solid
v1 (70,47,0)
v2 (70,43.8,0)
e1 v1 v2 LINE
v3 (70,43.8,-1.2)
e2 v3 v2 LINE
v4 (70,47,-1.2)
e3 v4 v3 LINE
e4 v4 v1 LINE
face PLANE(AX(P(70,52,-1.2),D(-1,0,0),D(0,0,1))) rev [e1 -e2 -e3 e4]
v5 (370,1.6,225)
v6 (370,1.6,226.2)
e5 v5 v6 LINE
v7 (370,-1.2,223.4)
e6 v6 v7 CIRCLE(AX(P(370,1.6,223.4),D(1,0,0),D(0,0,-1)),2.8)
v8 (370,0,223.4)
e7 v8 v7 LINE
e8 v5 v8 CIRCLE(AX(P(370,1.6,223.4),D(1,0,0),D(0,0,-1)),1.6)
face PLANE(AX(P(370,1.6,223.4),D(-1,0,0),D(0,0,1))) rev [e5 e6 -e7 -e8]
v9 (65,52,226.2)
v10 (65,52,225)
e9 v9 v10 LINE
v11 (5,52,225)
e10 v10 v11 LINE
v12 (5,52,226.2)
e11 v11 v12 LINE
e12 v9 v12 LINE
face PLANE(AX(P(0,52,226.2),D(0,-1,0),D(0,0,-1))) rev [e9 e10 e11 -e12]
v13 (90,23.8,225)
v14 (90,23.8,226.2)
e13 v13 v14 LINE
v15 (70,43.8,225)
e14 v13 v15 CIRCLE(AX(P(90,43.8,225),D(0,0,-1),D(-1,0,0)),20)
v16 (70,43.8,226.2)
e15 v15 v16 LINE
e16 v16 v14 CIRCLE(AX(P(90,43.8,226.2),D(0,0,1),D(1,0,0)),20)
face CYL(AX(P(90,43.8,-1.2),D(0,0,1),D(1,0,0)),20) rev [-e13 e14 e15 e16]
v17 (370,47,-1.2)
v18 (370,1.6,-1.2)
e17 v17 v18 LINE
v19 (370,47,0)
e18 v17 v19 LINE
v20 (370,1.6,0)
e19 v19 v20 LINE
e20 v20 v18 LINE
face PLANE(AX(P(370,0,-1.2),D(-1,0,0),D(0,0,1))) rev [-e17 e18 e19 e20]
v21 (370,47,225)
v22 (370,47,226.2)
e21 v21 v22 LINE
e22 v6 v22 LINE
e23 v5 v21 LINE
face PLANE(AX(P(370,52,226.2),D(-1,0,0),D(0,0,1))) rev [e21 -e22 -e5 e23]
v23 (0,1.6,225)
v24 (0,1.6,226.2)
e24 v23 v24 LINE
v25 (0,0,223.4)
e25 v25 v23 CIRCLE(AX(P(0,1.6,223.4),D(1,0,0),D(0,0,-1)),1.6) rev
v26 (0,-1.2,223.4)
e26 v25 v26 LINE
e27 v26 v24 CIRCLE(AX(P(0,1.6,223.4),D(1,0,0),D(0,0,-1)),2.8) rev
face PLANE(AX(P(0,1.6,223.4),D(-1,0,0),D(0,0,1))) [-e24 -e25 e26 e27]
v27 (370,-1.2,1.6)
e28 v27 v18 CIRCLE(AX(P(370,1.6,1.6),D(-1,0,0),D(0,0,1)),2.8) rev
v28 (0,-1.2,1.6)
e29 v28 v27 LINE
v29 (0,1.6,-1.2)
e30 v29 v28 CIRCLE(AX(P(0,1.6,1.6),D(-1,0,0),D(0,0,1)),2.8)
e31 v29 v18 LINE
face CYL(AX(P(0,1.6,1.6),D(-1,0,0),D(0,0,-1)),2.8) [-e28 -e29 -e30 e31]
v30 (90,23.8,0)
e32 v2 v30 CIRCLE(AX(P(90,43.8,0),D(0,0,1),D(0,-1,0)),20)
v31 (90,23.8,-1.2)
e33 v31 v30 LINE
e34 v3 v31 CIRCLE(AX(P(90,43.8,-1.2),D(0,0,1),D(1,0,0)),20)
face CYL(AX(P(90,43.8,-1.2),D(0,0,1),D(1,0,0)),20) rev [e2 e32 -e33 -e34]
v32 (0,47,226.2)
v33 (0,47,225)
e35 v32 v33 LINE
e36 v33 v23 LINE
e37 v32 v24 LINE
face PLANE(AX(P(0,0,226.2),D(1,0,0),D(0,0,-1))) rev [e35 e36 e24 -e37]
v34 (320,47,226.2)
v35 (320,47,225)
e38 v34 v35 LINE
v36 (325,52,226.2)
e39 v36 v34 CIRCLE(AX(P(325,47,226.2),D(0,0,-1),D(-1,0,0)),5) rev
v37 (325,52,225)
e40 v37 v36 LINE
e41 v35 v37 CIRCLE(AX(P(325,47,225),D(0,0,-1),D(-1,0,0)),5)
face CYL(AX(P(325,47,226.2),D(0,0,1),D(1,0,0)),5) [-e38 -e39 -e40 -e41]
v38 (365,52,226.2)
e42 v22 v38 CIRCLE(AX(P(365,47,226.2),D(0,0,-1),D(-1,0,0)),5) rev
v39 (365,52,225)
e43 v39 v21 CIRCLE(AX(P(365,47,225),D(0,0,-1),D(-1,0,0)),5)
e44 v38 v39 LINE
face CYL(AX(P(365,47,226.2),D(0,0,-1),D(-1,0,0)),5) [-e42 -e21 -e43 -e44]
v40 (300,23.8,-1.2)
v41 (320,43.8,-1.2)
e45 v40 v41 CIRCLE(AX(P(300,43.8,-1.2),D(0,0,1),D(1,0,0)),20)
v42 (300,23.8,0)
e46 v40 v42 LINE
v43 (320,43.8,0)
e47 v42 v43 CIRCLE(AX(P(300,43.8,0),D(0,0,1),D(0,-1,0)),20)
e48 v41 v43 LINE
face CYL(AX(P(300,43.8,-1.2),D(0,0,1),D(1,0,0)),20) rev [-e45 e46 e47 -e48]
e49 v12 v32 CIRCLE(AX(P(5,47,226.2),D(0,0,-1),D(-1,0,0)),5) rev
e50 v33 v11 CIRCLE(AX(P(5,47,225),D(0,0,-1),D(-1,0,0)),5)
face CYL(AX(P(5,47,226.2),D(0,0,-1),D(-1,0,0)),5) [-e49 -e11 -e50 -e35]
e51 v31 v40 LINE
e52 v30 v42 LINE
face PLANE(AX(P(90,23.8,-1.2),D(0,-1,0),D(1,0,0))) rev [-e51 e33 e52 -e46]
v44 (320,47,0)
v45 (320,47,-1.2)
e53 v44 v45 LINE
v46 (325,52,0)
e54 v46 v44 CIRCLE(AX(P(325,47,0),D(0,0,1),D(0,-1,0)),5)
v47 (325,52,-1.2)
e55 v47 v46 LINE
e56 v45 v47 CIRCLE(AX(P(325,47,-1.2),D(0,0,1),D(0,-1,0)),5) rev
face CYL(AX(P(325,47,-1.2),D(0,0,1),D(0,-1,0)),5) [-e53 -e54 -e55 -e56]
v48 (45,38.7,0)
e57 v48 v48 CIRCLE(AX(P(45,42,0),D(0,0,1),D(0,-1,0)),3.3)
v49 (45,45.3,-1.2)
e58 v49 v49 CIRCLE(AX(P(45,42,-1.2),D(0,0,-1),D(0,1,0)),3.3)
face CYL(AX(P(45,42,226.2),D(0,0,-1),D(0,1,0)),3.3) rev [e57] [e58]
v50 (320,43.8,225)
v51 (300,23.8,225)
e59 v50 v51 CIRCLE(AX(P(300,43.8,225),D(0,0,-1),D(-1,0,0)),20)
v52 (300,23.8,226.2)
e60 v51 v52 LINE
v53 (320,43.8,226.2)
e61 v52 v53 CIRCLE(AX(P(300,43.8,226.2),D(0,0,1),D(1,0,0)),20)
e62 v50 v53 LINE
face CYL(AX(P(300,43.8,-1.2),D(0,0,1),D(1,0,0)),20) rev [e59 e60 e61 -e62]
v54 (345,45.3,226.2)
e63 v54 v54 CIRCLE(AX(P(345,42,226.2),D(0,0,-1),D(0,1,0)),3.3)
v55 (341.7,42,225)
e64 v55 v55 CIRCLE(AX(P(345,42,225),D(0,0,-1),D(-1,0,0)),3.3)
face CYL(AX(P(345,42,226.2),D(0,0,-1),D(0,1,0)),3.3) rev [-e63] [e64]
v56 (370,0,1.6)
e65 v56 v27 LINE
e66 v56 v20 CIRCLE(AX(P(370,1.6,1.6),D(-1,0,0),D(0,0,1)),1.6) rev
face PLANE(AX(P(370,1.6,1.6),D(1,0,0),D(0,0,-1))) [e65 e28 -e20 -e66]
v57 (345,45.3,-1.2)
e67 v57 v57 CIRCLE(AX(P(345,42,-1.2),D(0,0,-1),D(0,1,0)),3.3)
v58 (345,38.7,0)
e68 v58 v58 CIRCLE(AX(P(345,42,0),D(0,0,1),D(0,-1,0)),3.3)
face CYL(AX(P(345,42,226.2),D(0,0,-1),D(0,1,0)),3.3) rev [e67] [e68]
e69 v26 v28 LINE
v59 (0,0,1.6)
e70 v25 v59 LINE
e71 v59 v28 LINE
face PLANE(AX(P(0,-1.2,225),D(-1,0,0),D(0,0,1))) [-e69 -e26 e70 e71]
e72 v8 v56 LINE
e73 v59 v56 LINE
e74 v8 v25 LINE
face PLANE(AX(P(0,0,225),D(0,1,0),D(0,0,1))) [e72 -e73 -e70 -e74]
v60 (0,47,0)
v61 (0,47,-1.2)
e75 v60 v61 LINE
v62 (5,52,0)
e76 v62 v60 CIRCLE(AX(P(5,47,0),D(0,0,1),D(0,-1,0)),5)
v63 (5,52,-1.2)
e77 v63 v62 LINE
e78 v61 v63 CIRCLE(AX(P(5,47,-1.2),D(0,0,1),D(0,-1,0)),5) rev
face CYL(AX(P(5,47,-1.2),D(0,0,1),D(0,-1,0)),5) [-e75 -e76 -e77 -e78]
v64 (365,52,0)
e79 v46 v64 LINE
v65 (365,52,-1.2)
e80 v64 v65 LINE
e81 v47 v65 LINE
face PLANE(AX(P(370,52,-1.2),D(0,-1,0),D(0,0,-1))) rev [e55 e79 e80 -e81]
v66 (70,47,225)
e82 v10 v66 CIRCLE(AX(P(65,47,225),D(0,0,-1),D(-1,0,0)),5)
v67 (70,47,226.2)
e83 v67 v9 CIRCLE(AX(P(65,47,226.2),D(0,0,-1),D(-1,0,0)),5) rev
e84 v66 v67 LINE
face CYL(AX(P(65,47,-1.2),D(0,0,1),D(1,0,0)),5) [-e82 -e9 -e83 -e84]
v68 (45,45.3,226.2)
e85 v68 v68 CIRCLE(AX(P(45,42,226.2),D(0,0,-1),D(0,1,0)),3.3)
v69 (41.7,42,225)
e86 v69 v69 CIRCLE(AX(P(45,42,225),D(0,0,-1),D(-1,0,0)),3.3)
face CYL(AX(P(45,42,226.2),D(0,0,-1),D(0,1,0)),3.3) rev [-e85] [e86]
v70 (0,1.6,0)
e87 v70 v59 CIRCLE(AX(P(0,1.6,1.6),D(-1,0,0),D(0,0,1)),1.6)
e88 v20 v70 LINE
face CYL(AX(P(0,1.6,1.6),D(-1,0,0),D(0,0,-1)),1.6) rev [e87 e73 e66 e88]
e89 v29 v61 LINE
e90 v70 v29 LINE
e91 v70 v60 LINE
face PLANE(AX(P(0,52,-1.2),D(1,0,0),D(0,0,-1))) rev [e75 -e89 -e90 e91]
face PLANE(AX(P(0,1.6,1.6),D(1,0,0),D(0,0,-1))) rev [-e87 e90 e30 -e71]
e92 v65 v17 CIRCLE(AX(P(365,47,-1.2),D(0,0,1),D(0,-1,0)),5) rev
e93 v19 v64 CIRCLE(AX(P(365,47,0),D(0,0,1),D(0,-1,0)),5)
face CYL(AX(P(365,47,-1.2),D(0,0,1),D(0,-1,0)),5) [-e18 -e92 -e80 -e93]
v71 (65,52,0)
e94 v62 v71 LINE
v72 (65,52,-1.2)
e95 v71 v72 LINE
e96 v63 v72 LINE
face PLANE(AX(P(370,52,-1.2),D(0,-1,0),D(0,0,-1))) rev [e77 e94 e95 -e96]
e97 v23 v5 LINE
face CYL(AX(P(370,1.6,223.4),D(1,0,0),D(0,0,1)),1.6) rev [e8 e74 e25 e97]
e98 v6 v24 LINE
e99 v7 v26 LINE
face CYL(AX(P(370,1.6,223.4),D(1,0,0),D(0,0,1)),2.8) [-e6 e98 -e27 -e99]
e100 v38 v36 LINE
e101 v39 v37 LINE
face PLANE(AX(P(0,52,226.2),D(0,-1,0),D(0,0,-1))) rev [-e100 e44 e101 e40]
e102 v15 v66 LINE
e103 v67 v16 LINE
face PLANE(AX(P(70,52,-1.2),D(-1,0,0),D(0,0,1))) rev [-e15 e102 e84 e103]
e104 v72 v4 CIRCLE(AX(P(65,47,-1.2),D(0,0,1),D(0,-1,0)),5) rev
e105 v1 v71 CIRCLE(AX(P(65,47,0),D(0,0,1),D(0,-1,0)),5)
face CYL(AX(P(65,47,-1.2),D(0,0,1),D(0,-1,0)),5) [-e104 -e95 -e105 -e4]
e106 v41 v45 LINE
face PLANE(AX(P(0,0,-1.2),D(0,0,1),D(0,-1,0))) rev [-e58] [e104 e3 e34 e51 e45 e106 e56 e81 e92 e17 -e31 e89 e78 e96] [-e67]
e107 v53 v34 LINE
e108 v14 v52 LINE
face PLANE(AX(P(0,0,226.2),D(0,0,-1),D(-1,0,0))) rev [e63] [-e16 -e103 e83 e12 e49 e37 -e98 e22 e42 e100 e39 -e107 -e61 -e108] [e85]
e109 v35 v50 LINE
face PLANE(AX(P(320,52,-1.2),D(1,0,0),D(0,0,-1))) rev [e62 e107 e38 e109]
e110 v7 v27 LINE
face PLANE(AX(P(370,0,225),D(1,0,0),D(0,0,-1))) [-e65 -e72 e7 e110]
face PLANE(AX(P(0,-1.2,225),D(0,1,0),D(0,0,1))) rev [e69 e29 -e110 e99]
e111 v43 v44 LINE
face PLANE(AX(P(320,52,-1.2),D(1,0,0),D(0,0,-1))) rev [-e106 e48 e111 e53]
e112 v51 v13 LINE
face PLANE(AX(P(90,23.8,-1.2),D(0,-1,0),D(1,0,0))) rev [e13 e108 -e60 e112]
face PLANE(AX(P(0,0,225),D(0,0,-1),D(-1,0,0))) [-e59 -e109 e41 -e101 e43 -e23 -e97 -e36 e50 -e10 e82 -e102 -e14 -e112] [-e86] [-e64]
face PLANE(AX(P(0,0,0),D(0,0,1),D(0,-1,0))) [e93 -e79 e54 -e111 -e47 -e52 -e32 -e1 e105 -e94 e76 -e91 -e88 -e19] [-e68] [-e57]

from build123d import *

# Parameters (mm, degrees)
SKETCH_1_W                         = 370
SKETCH_1_H                         = 1.2
SM_BASE_FLANGE_1_DEPTH             = 225
SM_EDGE_FLANGE_1_STRIP_W           = 8
SM_EDGE_FLANGE_1_STRIP_H           = 1.2
SM_EDGE_FLANGE_1_STRIP_CUT_DEPTH   = 370
SM_EDGE_FLANGE_1_STRIP_2_W         = 8
SM_EDGE_FLANGE_1_STRIP_2_H         = 1.2
SM_EDGE_FLANGE_1_STRIP_CUT_2_DEPTH = 370
SM_EDGE_FLANGE_1_DEPTH             = 370
SM_EDGE_FLANGE_1_BEND_DEPTH        = 370
CUT_EXTRUDE_1_DEPTH                = 438.395427502
FILLET_1_R                         = 5
SKETCH_17_R                        = 3.3
CUT_EXTRUDE_2_DEPTH                = 438.395427502


# Sheet-metal steps are written as plain solids
with BuildPart() as part:
    # Sketch 1 → Базовая кромка1 (new body)
    with BuildSketch(Plane.XY):
        with Locations((185, -0.6)):
            Rectangle(SKETCH_1_W, SKETCH_1_H)
    extrude(amount=SM_BASE_FLANGE_1_DEPTH)

    # Ребро-кромка1 strip (across the edge) → Ребро-кромка1 strip cut (cut)
    with BuildSketch(Plane(origin=(0, 0, 225), x_dir=(0, 0, -1), z_dir=(1, 0, 0))):
        with Locations((-2.4, -0.6)):
            Rectangle(SM_EDGE_FLANGE_1_STRIP_W, SM_EDGE_FLANGE_1_STRIP_H)
    extrude(amount=SM_EDGE_FLANGE_1_STRIP_CUT_DEPTH, mode=Mode.SUBTRACT)

    # Ребро-кромка1 strip 2 (across the edge) → Ребро-кромка1 strip cut 2 (cut)
    with BuildSketch(Plane.ZY.offset(-370)):
        with Locations((-2.4, -0.6)):
            Rectangle(SM_EDGE_FLANGE_1_STRIP_2_W, SM_EDGE_FLANGE_1_STRIP_2_H)
    extrude(amount=SM_EDGE_FLANGE_1_STRIP_CUT_2_DEPTH, mode=Mode.SUBTRACT)

    # Ребро-кромка1 section (across the edge) → Ребро-кромка1 (add)
    with BuildSketch(Plane(origin=(0, 0, 225), x_dir=(0, 0, -1), z_dir=(1, 0, 0))):
        with BuildLine():
            Line((-1.2, 1.6), (-1.2, 52))
            Line((-1.2, 52), (0, 52))
            Line((0, 52), (0, 1.6))
            ThreePointArc((0, 1.6), (0.46862915, 0.46862915), (1.6, 0))
            Line((1.6, 0), (1.6, -1.2))
            ThreePointArc((1.6, -1.2), (-0.379898987, -0.379898987), (-1.2, 1.6))
        make_face()
    extrude(amount=SM_EDGE_FLANGE_1_DEPTH)

    # Ребро-кромка1 section 2 (across the edge) → Ребро-кромка1 bend (add)
    with BuildSketch(Plane.ZY.offset(-370)):
        with BuildLine():
            Line((-1.2, 1.6), (-1.2, 52))
            Line((-1.2, 52), (0, 52))
            Line((0, 52), (0, 1.6))
            ThreePointArc((0, 1.6), (0.46862915, 0.46862915), (1.6, 0))
            Line((1.6, 0), (1.6, -1.2))
            ThreePointArc((1.6, -1.2), (-0.379898987, -0.379898987), (-1.2, 1.6))
        make_face()
    extrude(amount=SM_EDGE_FLANGE_1_BEND_DEPTH)

    # Эскиз14 → Вырез-Вытянуть1 (cut, through all)
    with BuildSketch(Plane.XY.offset(226.2)):
        with BuildLine():
            Line((70, 52), (320, 52))
            Line((320, 52), (320, 43.8))
            ThreePointArc((320, 43.8), (314.142135624, 29.657864376), (300, 23.8))
            Line((300, 23.8), (90, 23.8))
            ThreePointArc((90, 23.8), (75.857864376, 29.657864376), (70, 43.8))
            Line((70, 43.8), (70, 52))
        make_face()
    extrude(amount=-CUT_EXTRUDE_1_DEPTH, mode=Mode.SUBTRACT)

    # Скругление1
    fillet_1_edges = [part.edges().sort_by_distance(p)[0] for p in [
        (0, 52, 225.6),
        (370, 52, 225.6),
        (370, 52, -0.6),
        (0, 52, -0.6),
        (70, 52, 225.6),
        (320, 52, 225.6),
        (70, 52, -0.6),
        (320, 52, -0.6),
    ]]
    fillet(fillet_1_edges, radius=FILLET_1_R)

    # Эскиз17 → Вырез-Вытянуть2 (cut, through all)
    with BuildSketch(Plane(origin=(0, 0, -1.2), x_dir=(-1, 0, 0), z_dir=(0, 0, -1))):
        with Locations(Location((-345, 42, 0), (0, 0, 90))):
            Circle(SKETCH_17_R)
        with Locations(Location((-45, 42, 0), (0, 0, 90))):
            Circle(SKETCH_17_R)
    extrude(amount=-CUT_EXTRUDE_2_DEPTH, mode=Mode.SUBTRACT)


solid = part.part
